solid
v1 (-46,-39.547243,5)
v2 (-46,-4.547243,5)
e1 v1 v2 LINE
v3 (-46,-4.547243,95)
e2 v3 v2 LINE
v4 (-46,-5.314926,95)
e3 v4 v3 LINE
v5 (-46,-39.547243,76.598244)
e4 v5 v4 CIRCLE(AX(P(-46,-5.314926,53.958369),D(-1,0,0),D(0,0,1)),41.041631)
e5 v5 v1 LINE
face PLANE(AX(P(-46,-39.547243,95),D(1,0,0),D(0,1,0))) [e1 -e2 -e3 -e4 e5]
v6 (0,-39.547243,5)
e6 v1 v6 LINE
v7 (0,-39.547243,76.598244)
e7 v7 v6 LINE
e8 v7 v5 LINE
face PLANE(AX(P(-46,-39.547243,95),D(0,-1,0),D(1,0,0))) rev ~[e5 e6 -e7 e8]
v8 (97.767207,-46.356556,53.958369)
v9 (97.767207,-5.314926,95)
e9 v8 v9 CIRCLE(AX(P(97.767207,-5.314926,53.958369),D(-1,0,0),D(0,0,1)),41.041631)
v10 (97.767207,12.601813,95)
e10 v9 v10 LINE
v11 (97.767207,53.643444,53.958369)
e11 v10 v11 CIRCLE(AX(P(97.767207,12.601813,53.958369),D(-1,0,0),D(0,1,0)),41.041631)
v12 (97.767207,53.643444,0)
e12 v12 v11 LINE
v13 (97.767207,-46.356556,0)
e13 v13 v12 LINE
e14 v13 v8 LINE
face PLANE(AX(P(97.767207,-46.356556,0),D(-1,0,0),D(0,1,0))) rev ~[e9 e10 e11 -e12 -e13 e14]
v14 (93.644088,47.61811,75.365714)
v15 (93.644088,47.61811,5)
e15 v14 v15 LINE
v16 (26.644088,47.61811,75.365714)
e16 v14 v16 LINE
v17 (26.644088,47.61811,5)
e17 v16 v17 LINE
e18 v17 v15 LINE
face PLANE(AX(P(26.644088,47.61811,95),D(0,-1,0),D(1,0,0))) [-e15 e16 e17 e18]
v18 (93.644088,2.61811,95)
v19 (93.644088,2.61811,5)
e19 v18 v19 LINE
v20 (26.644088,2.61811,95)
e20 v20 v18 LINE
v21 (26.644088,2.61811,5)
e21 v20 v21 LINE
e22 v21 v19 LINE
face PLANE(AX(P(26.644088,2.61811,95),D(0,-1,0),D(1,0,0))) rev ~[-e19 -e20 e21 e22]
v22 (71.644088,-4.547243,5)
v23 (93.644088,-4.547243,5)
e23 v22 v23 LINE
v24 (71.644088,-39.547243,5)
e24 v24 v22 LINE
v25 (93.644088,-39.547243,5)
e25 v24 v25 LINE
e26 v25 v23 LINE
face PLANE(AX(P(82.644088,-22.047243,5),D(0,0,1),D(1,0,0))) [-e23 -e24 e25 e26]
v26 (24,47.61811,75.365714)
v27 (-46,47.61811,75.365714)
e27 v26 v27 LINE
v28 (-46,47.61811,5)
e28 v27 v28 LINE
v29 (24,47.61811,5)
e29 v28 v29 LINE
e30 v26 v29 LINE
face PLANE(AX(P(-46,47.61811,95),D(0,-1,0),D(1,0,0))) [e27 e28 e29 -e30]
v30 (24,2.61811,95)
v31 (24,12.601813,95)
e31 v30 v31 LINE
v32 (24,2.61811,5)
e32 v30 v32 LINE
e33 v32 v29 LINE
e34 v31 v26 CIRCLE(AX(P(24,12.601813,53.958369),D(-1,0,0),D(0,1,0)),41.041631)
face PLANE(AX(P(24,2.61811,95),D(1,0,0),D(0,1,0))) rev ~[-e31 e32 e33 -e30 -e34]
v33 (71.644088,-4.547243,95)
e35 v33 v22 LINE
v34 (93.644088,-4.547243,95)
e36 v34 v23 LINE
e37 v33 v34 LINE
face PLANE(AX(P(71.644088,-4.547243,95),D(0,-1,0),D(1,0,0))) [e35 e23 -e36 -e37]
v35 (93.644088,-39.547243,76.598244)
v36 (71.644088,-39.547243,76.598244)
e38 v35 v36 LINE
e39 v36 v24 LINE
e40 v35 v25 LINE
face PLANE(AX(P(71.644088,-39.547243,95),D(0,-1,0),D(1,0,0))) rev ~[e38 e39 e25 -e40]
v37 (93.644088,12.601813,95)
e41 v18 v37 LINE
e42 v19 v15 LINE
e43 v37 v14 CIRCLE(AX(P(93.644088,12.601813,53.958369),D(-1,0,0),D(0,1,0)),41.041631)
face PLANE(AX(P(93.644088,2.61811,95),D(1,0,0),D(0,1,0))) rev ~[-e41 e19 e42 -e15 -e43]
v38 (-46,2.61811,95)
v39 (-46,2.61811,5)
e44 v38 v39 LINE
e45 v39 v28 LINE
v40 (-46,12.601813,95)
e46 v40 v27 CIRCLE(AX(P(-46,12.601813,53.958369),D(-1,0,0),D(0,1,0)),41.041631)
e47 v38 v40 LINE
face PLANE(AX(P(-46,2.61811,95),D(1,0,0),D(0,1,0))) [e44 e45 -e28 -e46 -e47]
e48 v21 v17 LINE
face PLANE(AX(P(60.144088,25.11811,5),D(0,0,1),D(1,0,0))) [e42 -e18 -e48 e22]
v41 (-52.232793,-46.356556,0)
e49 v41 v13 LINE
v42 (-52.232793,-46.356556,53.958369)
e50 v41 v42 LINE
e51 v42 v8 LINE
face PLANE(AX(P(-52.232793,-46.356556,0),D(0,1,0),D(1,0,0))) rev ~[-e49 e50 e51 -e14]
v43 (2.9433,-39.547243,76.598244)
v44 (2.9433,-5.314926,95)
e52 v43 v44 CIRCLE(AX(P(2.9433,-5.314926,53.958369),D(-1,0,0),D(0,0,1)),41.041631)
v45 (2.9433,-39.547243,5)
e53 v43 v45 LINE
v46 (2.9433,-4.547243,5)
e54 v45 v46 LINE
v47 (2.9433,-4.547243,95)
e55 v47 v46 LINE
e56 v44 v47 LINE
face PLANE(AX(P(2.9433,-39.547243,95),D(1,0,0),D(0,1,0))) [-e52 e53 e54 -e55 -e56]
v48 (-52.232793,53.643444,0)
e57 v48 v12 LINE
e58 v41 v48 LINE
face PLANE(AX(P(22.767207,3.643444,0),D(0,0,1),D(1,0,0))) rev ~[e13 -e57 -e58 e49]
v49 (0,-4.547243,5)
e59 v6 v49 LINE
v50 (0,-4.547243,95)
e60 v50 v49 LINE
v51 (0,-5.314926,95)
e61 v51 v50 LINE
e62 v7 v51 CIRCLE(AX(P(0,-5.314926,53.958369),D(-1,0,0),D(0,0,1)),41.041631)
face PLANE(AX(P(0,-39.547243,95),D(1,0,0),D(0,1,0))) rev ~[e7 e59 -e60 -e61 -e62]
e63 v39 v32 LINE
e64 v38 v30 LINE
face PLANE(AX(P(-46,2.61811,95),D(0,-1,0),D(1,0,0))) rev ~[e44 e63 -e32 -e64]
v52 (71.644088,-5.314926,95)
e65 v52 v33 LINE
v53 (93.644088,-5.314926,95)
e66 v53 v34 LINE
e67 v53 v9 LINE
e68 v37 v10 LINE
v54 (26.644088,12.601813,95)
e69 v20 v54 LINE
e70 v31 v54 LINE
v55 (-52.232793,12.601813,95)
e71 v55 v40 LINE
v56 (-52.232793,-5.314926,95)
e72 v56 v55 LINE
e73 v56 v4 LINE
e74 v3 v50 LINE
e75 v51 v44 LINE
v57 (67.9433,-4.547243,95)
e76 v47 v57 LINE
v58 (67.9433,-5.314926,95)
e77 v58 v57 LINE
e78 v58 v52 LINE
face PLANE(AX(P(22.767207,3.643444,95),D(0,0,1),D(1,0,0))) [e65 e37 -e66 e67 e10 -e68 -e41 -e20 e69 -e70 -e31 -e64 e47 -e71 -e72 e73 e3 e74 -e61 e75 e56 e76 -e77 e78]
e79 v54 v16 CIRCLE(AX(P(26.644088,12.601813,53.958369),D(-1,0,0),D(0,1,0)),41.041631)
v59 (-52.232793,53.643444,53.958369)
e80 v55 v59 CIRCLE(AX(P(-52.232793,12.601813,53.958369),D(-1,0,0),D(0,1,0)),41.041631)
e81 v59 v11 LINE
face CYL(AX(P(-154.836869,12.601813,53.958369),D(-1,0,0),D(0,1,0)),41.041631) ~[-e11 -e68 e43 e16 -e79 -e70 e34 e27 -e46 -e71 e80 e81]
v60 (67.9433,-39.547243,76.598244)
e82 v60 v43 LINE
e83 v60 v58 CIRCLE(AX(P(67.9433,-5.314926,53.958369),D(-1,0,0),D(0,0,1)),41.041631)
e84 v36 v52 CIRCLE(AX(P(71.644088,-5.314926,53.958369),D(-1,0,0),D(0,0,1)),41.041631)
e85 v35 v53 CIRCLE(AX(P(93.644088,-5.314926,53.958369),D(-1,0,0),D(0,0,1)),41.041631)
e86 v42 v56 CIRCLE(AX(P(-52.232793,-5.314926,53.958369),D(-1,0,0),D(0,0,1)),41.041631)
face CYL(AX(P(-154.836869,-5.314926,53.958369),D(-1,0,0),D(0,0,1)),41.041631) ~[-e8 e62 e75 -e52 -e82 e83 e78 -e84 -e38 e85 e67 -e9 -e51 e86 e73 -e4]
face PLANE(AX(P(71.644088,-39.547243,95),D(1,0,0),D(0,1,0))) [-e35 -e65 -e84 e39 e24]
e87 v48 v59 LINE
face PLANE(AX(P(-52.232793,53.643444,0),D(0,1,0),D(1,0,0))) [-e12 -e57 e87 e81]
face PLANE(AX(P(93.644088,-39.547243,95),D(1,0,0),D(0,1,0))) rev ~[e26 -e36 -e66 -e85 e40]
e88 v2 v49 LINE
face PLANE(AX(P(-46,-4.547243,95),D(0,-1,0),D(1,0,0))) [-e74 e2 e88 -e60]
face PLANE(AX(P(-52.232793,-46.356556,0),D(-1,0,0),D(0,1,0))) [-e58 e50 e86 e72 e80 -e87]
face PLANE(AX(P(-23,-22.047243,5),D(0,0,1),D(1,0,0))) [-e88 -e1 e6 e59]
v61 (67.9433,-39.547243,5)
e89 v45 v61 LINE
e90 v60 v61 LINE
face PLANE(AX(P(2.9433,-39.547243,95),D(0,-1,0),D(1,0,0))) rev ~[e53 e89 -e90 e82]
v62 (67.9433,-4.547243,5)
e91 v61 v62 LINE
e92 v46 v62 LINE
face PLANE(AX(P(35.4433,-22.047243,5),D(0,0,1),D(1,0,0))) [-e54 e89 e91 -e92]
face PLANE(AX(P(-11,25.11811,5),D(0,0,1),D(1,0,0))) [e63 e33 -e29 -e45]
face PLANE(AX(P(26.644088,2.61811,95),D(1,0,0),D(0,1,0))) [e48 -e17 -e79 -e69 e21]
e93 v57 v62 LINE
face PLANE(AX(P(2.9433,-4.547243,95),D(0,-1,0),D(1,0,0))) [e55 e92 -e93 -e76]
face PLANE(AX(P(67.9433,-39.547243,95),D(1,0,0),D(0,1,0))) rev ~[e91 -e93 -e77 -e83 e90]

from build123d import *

# Parameters (mm, degrees)
F0_W        = 150
F0_H        = 100
F1_DEPTH    = 95
F2_W        = 70
F2_H        = 45
F2_W_2      = 67
F2_W_3      = 46
F2_H_2      = 35
F2_W_4      = 65
F2_W_5      = 22
F3_DEPTH    = 90
F4_T1_DEPTH = 355.2081528017


# Not quite as in the source:
# - a fillet or chamfer that OpenCascade refuses, or shapes differently, is made with other operations: its cross-section is extruded or revolved along the edge and cut away or added


with BuildPart() as f1:
    # F0 (on Top) → F1 (new body)
    with BuildSketch(Plane.XY):
        with Locations((22.7672072938, 3.643443808)):
            Rectangle(F0_W, F0_H)
    extrude(amount=F1_DEPTH)

    # F2 (on face) → F3 (cut)
    with BuildSketch(Plane.XY.offset(95)):
        with Locations((-11, 25.1181102521)):
            Rectangle(F2_W, F2_H)
        with Locations((60.1440875874, 25.1181102521)):
            Rectangle(F2_W_2, F2_H)
        with Locations((-23, -22.0472425799)):
            Rectangle(F2_W_3, F2_H_2)
        with Locations((35.4433003601, -22.0472425799)):
            Rectangle(F2_W_4, F2_H_2)
        with Locations((82.6440875874, -22.0472425799)):
            Rectangle(F2_W_5, F2_H_2)
    extrude(amount=-F3_DEPTH, mode=Mode.SUBTRACT)

    # F4: fillet of radius 41.0416305603 on 2 edges, made by hand

    # F4_s2 → F4_t1 (cut)
    with BuildSketch(Plane.YZ.offset(-154.8368691071)):
        with BuildLine():
            ThreePointArc((-5.3149256317, 95), (-34.3357409119, 82.9791847198), (-46.356556192, 53.9583694397))
            Line((-46.356556192, 53.9583694397), (-46.356556192, 95))
            Line((-46.356556192, 95), (-5.3149256317, 95))
        make_face()
        with BuildLine():
            ThreePointArc((53.643443808, 53.9583694397), (41.6226285278, 82.9791847198), (12.6018132476, 95))
            Line((12.6018132476, 95), (53.643443808, 95))
            Line((53.643443808, 95), (53.643443808, 53.9583694397))
        make_face()
    extrude(amount=F4_T1_DEPTH, mode=Mode.SUBTRACT)


solid = f1.part
